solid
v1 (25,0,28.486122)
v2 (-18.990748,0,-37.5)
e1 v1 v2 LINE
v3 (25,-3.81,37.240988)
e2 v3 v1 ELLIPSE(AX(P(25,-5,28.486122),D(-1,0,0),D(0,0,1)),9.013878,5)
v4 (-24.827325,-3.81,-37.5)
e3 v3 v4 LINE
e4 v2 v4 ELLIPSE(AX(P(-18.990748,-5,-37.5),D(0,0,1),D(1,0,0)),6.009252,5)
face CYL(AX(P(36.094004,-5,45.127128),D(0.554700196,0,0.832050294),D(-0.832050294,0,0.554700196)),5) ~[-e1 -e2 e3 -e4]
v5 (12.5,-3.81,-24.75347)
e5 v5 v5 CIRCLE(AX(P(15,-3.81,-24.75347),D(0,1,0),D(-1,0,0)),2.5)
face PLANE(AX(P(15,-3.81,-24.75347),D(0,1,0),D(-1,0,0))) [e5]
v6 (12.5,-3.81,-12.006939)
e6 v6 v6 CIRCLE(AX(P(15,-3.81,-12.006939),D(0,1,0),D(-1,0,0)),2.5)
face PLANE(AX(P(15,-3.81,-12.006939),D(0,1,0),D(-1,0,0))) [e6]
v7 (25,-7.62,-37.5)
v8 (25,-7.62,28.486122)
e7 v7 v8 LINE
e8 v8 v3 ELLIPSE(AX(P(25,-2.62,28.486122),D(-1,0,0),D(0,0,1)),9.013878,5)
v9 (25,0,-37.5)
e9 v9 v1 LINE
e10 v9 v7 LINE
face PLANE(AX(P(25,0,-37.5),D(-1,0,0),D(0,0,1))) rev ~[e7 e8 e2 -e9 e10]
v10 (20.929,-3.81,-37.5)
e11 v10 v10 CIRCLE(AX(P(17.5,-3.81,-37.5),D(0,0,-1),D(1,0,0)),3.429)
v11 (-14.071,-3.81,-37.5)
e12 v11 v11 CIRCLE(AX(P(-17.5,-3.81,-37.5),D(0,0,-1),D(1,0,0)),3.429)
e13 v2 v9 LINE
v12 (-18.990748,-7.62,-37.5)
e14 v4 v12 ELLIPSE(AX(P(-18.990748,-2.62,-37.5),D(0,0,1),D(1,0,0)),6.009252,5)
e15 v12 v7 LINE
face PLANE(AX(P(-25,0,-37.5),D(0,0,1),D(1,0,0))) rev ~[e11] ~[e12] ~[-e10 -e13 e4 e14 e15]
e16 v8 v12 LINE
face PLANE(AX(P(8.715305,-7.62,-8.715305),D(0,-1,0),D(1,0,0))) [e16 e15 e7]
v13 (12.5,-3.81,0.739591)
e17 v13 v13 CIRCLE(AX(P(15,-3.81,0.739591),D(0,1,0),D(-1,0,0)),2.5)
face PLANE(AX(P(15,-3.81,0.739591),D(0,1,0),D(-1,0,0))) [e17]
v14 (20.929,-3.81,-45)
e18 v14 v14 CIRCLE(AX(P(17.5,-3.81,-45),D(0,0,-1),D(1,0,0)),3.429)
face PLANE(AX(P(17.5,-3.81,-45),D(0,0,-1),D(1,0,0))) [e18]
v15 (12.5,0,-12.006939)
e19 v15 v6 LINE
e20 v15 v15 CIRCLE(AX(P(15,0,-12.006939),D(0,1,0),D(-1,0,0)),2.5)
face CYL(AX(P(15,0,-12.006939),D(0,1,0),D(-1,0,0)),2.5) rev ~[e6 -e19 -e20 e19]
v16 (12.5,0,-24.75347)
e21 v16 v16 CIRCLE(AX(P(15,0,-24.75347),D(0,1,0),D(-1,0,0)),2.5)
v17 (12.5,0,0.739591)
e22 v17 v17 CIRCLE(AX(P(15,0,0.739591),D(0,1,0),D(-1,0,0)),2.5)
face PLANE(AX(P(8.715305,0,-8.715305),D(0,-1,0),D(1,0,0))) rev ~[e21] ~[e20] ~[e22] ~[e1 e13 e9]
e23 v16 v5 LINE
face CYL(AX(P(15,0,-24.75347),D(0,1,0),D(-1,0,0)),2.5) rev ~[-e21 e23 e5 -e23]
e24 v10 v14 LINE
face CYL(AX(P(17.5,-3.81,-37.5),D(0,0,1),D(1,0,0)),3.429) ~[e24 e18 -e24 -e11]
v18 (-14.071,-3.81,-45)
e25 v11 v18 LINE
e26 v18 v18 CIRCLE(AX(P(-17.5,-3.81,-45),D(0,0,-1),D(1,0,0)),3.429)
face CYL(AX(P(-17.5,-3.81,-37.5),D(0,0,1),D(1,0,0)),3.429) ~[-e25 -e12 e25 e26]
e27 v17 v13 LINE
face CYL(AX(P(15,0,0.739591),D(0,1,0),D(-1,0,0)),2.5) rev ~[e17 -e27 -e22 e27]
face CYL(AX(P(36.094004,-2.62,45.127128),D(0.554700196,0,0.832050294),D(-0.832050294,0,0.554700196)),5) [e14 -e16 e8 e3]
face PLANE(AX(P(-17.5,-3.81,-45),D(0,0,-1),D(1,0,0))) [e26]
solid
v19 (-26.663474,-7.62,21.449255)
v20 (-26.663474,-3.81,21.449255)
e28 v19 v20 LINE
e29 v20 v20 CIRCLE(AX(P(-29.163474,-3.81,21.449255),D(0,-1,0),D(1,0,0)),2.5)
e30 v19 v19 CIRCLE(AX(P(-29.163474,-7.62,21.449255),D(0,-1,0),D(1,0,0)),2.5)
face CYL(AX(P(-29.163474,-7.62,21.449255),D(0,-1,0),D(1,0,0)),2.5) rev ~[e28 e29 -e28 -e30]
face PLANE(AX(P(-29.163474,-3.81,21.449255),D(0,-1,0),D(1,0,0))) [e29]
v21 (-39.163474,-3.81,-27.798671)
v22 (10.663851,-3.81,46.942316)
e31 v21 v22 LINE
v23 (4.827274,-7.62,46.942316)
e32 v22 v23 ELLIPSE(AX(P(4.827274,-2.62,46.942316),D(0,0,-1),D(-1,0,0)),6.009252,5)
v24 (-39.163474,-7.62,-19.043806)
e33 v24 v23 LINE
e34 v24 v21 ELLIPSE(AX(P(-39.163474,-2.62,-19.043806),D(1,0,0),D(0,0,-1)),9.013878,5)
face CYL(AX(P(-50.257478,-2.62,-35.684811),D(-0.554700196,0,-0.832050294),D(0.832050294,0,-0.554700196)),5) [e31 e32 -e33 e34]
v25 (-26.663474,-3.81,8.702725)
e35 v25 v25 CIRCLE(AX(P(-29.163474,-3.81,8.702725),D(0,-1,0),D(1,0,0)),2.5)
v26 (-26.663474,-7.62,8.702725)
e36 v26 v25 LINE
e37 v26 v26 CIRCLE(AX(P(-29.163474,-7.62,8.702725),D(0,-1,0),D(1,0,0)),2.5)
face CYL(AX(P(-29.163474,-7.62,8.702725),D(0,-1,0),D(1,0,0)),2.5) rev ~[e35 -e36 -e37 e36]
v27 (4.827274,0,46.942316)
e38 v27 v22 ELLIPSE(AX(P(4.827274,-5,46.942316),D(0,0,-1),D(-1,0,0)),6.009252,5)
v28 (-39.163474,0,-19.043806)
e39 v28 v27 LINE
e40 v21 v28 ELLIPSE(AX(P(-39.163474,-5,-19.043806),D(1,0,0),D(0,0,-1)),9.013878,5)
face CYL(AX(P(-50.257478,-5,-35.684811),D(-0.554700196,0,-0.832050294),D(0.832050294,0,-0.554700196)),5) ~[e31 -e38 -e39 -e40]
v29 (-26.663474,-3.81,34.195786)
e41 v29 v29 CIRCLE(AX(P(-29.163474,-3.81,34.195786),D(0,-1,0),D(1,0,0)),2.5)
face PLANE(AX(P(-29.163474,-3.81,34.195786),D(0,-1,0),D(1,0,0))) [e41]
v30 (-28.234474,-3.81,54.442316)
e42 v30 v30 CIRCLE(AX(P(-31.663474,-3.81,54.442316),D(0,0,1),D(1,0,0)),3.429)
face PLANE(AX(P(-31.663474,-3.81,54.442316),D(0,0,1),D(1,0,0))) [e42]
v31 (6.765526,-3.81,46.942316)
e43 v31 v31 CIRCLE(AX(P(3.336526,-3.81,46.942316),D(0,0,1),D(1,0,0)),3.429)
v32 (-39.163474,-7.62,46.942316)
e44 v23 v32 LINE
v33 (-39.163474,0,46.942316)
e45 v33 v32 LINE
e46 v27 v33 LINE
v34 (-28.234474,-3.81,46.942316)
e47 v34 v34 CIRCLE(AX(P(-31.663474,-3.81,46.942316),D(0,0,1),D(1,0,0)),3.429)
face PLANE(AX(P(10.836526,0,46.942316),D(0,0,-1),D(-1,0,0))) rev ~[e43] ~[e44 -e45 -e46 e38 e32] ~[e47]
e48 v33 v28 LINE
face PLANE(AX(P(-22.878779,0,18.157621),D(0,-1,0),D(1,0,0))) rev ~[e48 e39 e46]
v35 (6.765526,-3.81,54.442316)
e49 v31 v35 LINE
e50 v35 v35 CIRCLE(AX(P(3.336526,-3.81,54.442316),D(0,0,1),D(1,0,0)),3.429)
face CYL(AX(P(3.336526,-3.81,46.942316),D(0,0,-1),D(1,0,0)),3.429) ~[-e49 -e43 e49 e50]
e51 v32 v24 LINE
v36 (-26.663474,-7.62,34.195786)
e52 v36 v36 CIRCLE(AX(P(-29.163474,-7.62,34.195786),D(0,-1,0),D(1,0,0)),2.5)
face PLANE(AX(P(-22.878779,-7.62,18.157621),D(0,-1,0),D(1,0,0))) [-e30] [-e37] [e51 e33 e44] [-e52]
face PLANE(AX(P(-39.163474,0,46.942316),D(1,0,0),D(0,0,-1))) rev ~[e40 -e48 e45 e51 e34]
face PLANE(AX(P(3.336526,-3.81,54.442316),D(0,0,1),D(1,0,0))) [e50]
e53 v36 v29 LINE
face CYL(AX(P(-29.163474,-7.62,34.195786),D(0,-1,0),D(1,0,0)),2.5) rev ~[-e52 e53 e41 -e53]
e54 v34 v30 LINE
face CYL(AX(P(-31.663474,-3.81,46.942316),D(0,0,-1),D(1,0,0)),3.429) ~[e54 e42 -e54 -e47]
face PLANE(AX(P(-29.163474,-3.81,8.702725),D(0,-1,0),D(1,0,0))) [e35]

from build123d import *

# Parameters (mm, degrees)
F1_DEPTH      = 7.62
F2_R          = 3.429
F4_DEPTH      = 7.5
F3_R          = 3.429
F5_DEPTH      = 7.5
F6_T1_DEPTH   = 115.1387818866
F6_2_T1_DEPTH = 115.1387818866
F7_R          = 2.5
F9_DEPTH      = 3.81
F8_R          = 2.5
F10_DEPTH     = 3.81


# Not quite as in the source:
# - a fillet or chamfer that OpenCascade refuses, or shapes differently, is made with other operations: its cross-section is extruded or revolved along the edge and cut away or added


with BuildPart() as f1:
    # F0 (on Front) → F1 (new body)
    with BuildSketch(Plane.XZ):
        Polygon((25, 37.5), (-25, -37.5), (25, -37.5), align=None)
    extrude(amount=F1_DEPTH)

    # F3 (on face) → F5 (join)
    with BuildSketch(Plane(origin=(0, 0, -37.5), x_dir=(1, 0, 0), z_dir=(0, 0, -1))):
        with Locations((-17.5, 3.81)):
            Circle(F3_R)
        with Locations((17.5, 3.81)):
            Circle(F3_R)
    extrude(amount=F5_DEPTH)

    # F6: fillet of radius 5 on 2 edges, made by hand

    # F6_s2 → F6_t1 (cut)
    with BuildSketch(Plane(origin=(31.9337524528, 0, 47.9006286792), x_dir=(0, 1, 0), z_dir=(-0.5547001962, 0, -0.8320502943))):
        with BuildLine():
            ThreePointArc((-2.62, 0), (-6.1555339059, 1.4644660941), (-7.62, 5))
            Line((-7.62, 5), (-7.62, 0))
            Line((-7.62, 0), (-2.62, 0))
        make_face()
        with BuildLine():
            ThreePointArc((-5, 0), (-1.4644660941, 1.4644660941), (0, 5))
            Line((0, 5), (0, 0))
            Line((0, 0), (-5, 0))
        make_face()
    extrude(amount=F6_T1_DEPTH, mode=Mode.SUBTRACT)

    # F7 (on face) → F9 (cut)
    with BuildSketch(Plane(origin=(0, 0, 0), x_dir=(-1, 0, 0), z_dir=(0, 1, 0))):
        with Locations((-15, -24.7534695472)):
            Circle(F7_R)
        with Locations((-15, -12.0069390943)):
            Circle(F7_R)
        with Locations((-15, 0.7395913585)):
            Circle(F7_R)
    extrude(amount=-F9_DEPTH, mode=Mode.SUBTRACT)


with BuildPart() as f1b:
    # F0 (on Front) → F1, piece 2 (new body)
    with BuildSketch(Plane.XZ):
        Polygon((-39.1634743611, -28.0576837592), (10.8365256389, 46.9423162408), (-39.1634743611, 46.9423162408), align=None)
    extrude(amount=F1_DEPTH)

    # F2 (on face) → F4 (join)
    with BuildSketch(Plane.XY.offset(46.9423162408)):
        with Locations((-31.6634743611, -3.81)):
            Circle(F2_R)
        with Locations((3.3365256389, -3.81)):
            Circle(F2_R)
    extrude(amount=F4_DEPTH)

    # F6#2: fillet of radius 5 on 2 edges, made by hand

    # F6_2_s2 → F6_2_t1 (cut)
    with BuildSketch(Plane(origin=(-31.9337524528, 0, -47.9006286792), x_dir=(0, 1, 0), z_dir=(0.5547001962, 0, 0.8320502943))):
        with BuildLine():
            ThreePointArc((-5, 17.0223776826), (-1.4644660941, 18.4868437767), (0, 22.0223776826))
            Line((0, 22.0223776826), (0, 17.0223776826))
            Line((0, 17.0223776826), (-5, 17.0223776826))
        make_face()
        with BuildLine():
            ThreePointArc((-2.62, 17.0223776826), (-6.1555339059, 18.4868437767), (-7.62, 22.0223776826))
            Line((-7.62, 22.0223776826), (-7.62, 17.0223776826))
            Line((-7.62, 17.0223776826), (-2.62, 17.0223776826))
        make_face()
    extrude(amount=F6_2_T1_DEPTH, mode=Mode.SUBTRACT)

    # F8 (on face) → F10 (cut)
    with BuildSketch(Plane.XZ.offset(7.62)):
        with Locations((-29.1634743611, 8.7027248823)):
            Circle(F8_R)
        with Locations((-29.1634743611, 21.4492553351)):
            Circle(F8_R)
        with Locations((-29.1634743611, 34.1957857879)):
            Circle(F8_R)
    extrude(amount=-F10_DEPTH, mode=Mode.SUBTRACT)


solid = Compound([f1.part, f1b.part])
